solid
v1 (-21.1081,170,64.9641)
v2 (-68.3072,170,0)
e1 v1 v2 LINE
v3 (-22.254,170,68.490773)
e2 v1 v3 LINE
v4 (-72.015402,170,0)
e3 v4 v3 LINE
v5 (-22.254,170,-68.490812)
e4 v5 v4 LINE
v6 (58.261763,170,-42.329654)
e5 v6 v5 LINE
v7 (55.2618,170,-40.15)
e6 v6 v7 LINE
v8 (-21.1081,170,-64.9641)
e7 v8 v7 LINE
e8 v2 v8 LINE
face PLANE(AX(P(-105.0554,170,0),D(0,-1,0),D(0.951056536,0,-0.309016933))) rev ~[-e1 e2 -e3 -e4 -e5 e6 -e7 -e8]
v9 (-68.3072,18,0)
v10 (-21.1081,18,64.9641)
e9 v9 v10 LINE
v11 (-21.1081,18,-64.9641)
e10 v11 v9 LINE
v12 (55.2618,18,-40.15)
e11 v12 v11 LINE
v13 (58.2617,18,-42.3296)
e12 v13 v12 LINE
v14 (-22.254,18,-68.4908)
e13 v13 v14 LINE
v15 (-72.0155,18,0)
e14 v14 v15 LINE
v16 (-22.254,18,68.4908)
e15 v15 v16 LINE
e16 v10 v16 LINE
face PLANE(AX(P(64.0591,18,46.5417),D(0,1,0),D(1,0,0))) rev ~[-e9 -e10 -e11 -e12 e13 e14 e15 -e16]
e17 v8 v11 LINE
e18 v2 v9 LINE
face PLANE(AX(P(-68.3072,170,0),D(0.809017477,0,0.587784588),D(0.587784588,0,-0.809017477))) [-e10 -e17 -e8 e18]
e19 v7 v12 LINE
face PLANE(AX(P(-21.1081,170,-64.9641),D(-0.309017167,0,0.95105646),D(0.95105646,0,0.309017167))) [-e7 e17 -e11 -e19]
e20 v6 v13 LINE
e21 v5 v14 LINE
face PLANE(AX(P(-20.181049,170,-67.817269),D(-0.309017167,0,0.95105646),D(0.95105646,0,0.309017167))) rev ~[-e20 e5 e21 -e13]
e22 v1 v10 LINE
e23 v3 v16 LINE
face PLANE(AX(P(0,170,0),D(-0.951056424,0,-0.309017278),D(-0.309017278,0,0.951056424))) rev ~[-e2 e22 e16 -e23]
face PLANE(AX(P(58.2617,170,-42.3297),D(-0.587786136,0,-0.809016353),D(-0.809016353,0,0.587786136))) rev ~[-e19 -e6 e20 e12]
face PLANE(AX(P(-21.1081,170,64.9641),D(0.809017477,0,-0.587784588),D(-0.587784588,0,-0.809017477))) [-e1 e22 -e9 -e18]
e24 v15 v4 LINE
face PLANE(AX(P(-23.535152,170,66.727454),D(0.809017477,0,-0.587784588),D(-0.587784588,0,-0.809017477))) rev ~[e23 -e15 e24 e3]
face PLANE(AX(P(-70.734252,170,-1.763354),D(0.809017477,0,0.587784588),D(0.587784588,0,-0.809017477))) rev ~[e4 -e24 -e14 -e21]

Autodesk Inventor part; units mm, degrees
sketch "草图1" plane through (0, 0, 0) normal (0, 1, 0) x (-1, 0, 0)
  line L0 (82.5131, 0) -> (25.498, -78.4746)
  line L1 (25.498, -78.4746) -> (-66.7545, -48.5)
  line L2 (-66.7545, -48.5) -> (-66.7545, 48.5)
  line L3 (-66.7545, 48.5) -> (25.498, 78.4746)
  line L4 (25.498, 78.4746) -> (82.5131, 0)
  point P0 (0, 0)
  point P1 (0, 0)
  dimension "d0" = 97
ref_plane "工作平面1" through (0, 170, 0) normal (0, 1, 0) x (-1, 0, 0)
sketch "草图2" plane through (0, 170, 0) normal (0, 1, 0) x (-1, 0, 0)
  line L0 (105.0554, 0) -> (32.4639, -99.9136)
  line L1 (32.4639, -99.9136) -> (-84.9916, -61.75)
  line L2 (-84.9916, -61.75) -> (-84.9916, 61.75)
  line L3 (-84.9916, 61.75) -> (32.4639, 99.9136)
  line L4 (32.4639, 99.9136) -> (105.0554, 0)
  point P0 (0, 0)
  point P1 (0, 0)
  dimension "d2" = 123.5
loft "放样1" add profiles "草图2", "草图1"
sketch "草图3" plane through (84.9916, 170, 61.75) normal (0, 1, 0) x (1, 0, 0)
  line L0 (-153.2988, 61.75) -> (-106.0997, 126.7141)
  line L1 (-106.0997, 126.7141) -> (-29.7298, 101.9)
  line L2 (-29.7298, 101.9) -> (-29.7298, 21.6)
  line L3 (-29.7298, 21.6) -> (-106.0997, -3.2141)
  line L4 (-106.0997, -3.2141) -> (-153.2988, 61.75)
  point P0 (-84.9916, 61.75)
  point P1 (-84.9916, 61.75)
  dimension "d7" = 80.3
extrude "拉伸1" cut sketch "草图3" against normal blind 164
shell "抽壳1" thickness 3 removed faces 1 at (10.4732, 170, -75.5426)
sketch "草图5" plane through (66.7545, 0, -48.5) normal (0, -1, 0) x (1, 0, 0)
  line L0 (-98.0659, 144.8667) -> (-91.2229, 123.806) projected
  line L1 (-106.5917, 71.5) -> (-123.9122, 81.5)
  line L2 (-107.7408, 69.3836) -> (-125.561, 78.4634)
  arc A0 (-106.5917, 71.5) -> (-107.7408, 69.3836) centre (-66.7545, 48.5) ccw
  arc A1 (-123.9122, 81.5) -> (-125.561, 78.4634) centre (-66.7545, 48.5) ccw
  point P0 (-99.2814, 81.0269)
  dimension "d37" = 132
  dimension "d38" = 92
  dimension "d40" = 3
extrude "拉伸2" add sketch "草图5" along normal blind 3
sketch "草图7" plane through (66.7545, -3, -48.5) normal (0, -1, 0) x (1, 0, 0)
  arc A0 (-100.9392, 79.28) -> (-106.5917, 71.5) centre (-66.7545, 48.5) ccw
  arc A1 (-115.8021, 92.6626) -> (-125.561, 78.4634) centre (-66.7545, 48.5) ccw
  arc A2 (-100.9392, 79.28) -> (-107.7408, 69.3836) centre (-66.7545, 48.5) ccw
  line L0 (-100.9392, 79.28) -> (-115.8021, 92.6626)
  line L1 (-125.561, 78.4634) -> (-107.7408, 69.3836) projected
  line L2 (-107.7408, 69.3836) -> (-125.561, 78.4634)
  dimension "d25" = 92
  dimension "d41" = 15
extrude "拉伸3" add sketch "草图7" along normal blind 3
chamfer "倒角1" distance 1 angle 45 1 edges at (-41.6161, -3, 37.4713)
sketch "草图8" plane through (66.7545, 0, -48.5) normal (0, -1, 0) x (1, 0, 0)
  circle A0 centre (-66.7545, 48.5) radius 15
  dimension "d100" = 30
extrude "拉伸4" add sketch "草图8" along normal blind 30
pattern_circular "环形阵列1" count 10 over 360 about axis through (0, -10, 0) along (0, 1, 0) of "拉伸3", "拉伸2", "倒角1"
sketch "草图9" plane through (64.0591, 3, 46.5417) normal (0, 1, 0) x (1, 0, 0)
  line L0 (-132.3664, 46.5417) -> (-85.1672, 111.5058) projected
  line L1 (-85.1672, -18.4224) -> (-132.3664, 46.5417) projected
  line L2 (-8.7974, 6.3917) -> (-85.1672, -18.4224) projected
  line L3 (-8.7974, 86.6917) -> (-8.7974, 6.3917) projected
  line L4 (-85.1672, 111.5058) -> (-8.7974, 86.6917) projected
  line L5 (-136.0746, 46.5417) -> (-86.3131, -21.9491) projected
  line L6 (-86.3131, -21.9491) -> (-5.7974, 4.2121) projected
  line L7 (-5.7974, 4.2121) -> (-5.7974, 88.8713) projected
  line L8 (-5.7974, 88.8713) -> (-86.3131, 115.0325) projected
  line L9 (-86.3131, 115.0325) -> (-136.0746, 46.5417) projected
  line L10 (-85.1672, -18.4224) -> (-132.3664, 46.5417) projected
  line L11 (-132.3664, 46.5417) -> (-85.1672, 111.5058) projected
  line L12 (-85.1672, 111.5058) -> (-8.7974, 86.6917) projected
  line L13 (-8.7974, 86.6917) -> (-8.7974, 6.3917) projected
  line L14 (-8.7974, 6.3917) -> (-85.1672, -18.4224) projected
  line L15 (-143.2406, 46.5417) -> (-88.5276, 121.8477) projected
  line L16 (-88.5276, -28.7643) -> (-143.2406, 46.5417) projected
  line L17 (0, 0) -> (-88.5276, -28.7643) projected
  line L18 (0, 93.0834) -> (0, 0) projected
  line L19 (-88.5276, 121.8477) -> (0, 93.0834) projected
  line L20 (-145.4076, 46.5417) -> (-89.1972, 123.9087)
  line L21 (-89.1972, 123.9087) -> (1.7532, 94.3571)
  line L22 (1.7532, 94.3571) -> (1.7532, -1.2738)
  line L23 (1.7532, -1.2738) -> (-89.1972, -30.8253)
  line L24 (-89.1972, -30.8253) -> (-145.4076, 46.5417)
  point P0 (-64.0591, 46.5417)
extrude "拉伸5" add sketch "草图9" along normal blind 15 contours L15 L19 L18 L17 L16 | L20 L21 L22 L23 L24
sketch "草图10" plane through (84.9916, 6, 61.75) normal (0, 1, 0) x (1, 0, 0)
  line L0 (-153.2988, 61.75) -> (-106.0997, 126.7141) projected
  line L1 (-106.0997, -3.2141) -> (-153.2988, 61.75) projected
  line L2 (-29.7298, 21.6) -> (-106.0997, -3.2141) projected
  line L3 (-29.7298, 101.9) -> (-29.7298, 21.6) projected
  line L4 (-106.0997, 126.7141) -> (-29.7298, 101.9) projected
  line L5 (-107.2456, 130.2408) -> (-157.007, 61.75) projected
  line L6 (-26.7298, 104.0796) -> (-107.2456, 130.2408) projected
  line L7 (-26.7298, 19.4204) -> (-26.7298, 104.0796) projected
  line L8 (-107.2456, -6.7408) -> (-26.7298, 19.4204) projected
  line L9 (-157.007, 61.75) -> (-107.2456, -6.7408) projected
  line L10 (-166.1621, 61.75) -> (-110.0746, 138.9477) projected
  line L11 (-110.0746, -15.4477) -> (-166.1621, 61.75) projected
  line L12 (-19.3233, 14.0392) -> (-110.0746, -15.4477) projected
  line L13 (-19.3233, 109.4608) -> (-19.3233, 14.0392) projected
  line L14 (-110.0746, 138.9477) -> (-19.3233, 109.4608) projected
  point P0 (-84.9916, 61.75)
sketch "草图11" plane through (64.0591, 18, 46.5417) normal (0, 1, 0) x (1, 0, 0)
  line L0 (-64.0591, 46.5417) -> (2.6954, 46.5417) construction
  line L1 (-86.3131, 115.0325) -> (-136.0746, 46.5417) projected
  line L2 (-5.7974, 88.8713) -> (-86.3131, 115.0325) projected
  line L3 (-5.7974, 4.2121) -> (-5.7974, 88.8713) projected
  line L4 (-86.3131, -21.9491) -> (-5.7974, 4.2121) projected
  line L5 (-136.0746, 46.5417) -> (-86.3131, -21.9491) projected
  line L6 (-145.2296, 46.5417) -> (-89.1422, 123.7394) projected
  line L7 (-89.1422, -30.656) -> (-145.2296, 46.5417) projected
  line L8 (1.6092, -1.1691) -> (-89.1422, -30.656) projected
  line L9 (1.6092, 94.2525) -> (1.6092, -1.1691) projected
  line L10 (-89.1422, 123.7394) -> (1.6092, 94.2525) projected
  circle A0 centre (-2.0908, 11.2121) radius 1.25
  line L11 (-5.7974, 4.2121) -> (1.6092, -1.1691) construction
  line L12 (-5.7974, 4.2121) -> (-5.7974, 88.8713) projected
  line L13 (-86.3131, -21.9491) -> (-5.7974, 4.2121) projected
  line L14 (1.6092, -1.1691) -> (-89.1422, -30.656) projected
  line L15 (1.6092, 94.2525) -> (1.6092, -1.1691) projected
  circle A1 centre (-11.3094, -1.4762) radius 1.25
  line L16 (-2.0941, 7.5215) -> (-0.5941, 7.5215)
  line L17 (-0.5941, 7.5215) -> (-0.5941, 0.4317)
  line L18 (-2.0941, 7.5215) -> (-3.5941, 7.5215)
  line L19 (-3.5941, 7.5215) -> (-3.5941, 2.6113)
  line L20 (-7.8005, -0.3326) -> (-7.3369, -1.7592)
  line L21 (-7.3369, -1.7592) -> (-0.5941, 0.4317)
  line L22 (-7.8005, -0.3326) -> (-8.264, 1.094)
  line L23 (-8.264, 1.094) -> (-3.5941, 2.6113)
  dimension "d63" = 2.5
  dimension "d69" = 3.7
  dimension "d131" = 3.6906
extrude "拉伸7" cut sketch "草图11" against normal blind 3 contours A0 | A1 | L16 L17 L21 L20 L22 L23 L19 L18
extrude "拉伸8" add sketch "草图10" along normal blind 10 and the other way blind 3 contours L10 L14 L13 L12 L11
extrude "拉伸9" cut sketch "草图10" along normal blind 10 and the other way blind 3 contours L10 L14 L13 L12 L11
ref_plane "工作平面2" through (84.9916, 7, 61.75) normal (0, 1, 0) x (1, 0, 0)
sketch "草图12" plane through (84.9916, 7, 61.75) normal (0, 1, 0) x (1, 0, 0)
  line L0 (-107.2456, -6.7408) -> (-26.7298, 19.4204) projected
  line L1 (-60.7054, 8.3811) -> (-61.6324, 11.2342)
  line L2 (-29.7298, 21.6) -> (-106.0997, -3.2141) projected
  line L3 (-89.8404, 2.0689) -> (-88.9133, -0.7843)
  line L4 (-107.2456, -6.7408) -> (-26.7298, 19.4204) projected
  line L5 (-29.7298, 21.6) -> (-106.0997, -3.2141) projected
  line L6 (-63.5345, 10.6162) -> (-62.6075, 7.763)
  line L7 (-65.4366, 9.9982) -> (-64.5096, 7.145)
  line L8 (-67.3388, 9.3801) -> (-66.4117, 6.527)
  line L9 (-69.2409, 8.7621) -> (-68.3138, 5.9089)
  line L10 (-71.143, 8.1441) -> (-70.2159, 5.2909)
  line L11 (-73.0451, 7.526) -> (-72.118, 4.6729)
  line L12 (-74.9472, 6.908) -> (-74.0202, 4.0548)
  line L13 (-76.7905, 6.3091) -> (-75.7638, 3.4883)
  line L14 (-84.134, 3.923) -> (-83.207, 1.0698)
  line L15 (-86.0362, 3.305) -> (-85.1091, 0.4518)
  line L16 (-87.9383, 2.6869) -> (-87.0112, -0.1662)
  line L17 (-80.3298, 5.1591) -> (-79.4028, 2.3059)
  line L18 (-82.2319, 4.541) -> (-81.3049, 1.6879)
  line L19 (-78.4277, 5.7771) -> (-77.5006, 2.9239)
  line L20 (-61.6324, 11.2342) -> (-63.5345, 10.6162)
  line L21 (-62.6075, 7.763) -> (-60.7054, 8.3811)
  line L22 (-66.4117, 6.527) -> (-64.5096, 7.145)
  line L23 (-65.4366, 9.9982) -> (-67.3388, 9.3801)
  line L24 (-70.2159, 5.2909) -> (-68.3138, 5.9089)
  line L25 (-69.2409, 8.7621) -> (-71.143, 8.1441)
  line L26 (-74.0202, 4.0548) -> (-72.118, 4.6729)
  line L27 (-73.0451, 7.526) -> (-74.9472, 6.908)
  line L28 (-76.7905, 6.3091) -> (-78.4277, 5.7771)
  line L29 (-77.5006, 2.9239) -> (-75.7638, 3.4883)
  line L30 (-81.3049, 1.6879) -> (-79.4028, 2.3059)
  line L31 (-80.3298, 5.1591) -> (-82.2319, 4.541)
  line L32 (-84.134, 3.923) -> (-86.0362, 3.305)
  line L33 (-87.9383, 2.6869) -> (-89.8404, 2.0689)
  line L34 (-88.9133, -0.7843) -> (-87.0112, -0.1662)
  line L35 (-85.1091, 0.4518) -> (-83.207, 1.0698)
  line L36 (-58.8033, 8.9991) -> (-59.7303, 11.8523)
  line L37 (-56.9011, 9.6171) -> (-57.8282, 12.4703)
  line L38 (-54.999, 10.2352) -> (-55.9261, 13.0883)
  line L39 (-53.0969, 10.8532) -> (-54.024, 13.7064)
  point P0 (-84.9916, 61.75)
  dimension "d73" = 2
  dimension "d74" = 2
  dimension "d75" = 2
  dimension "d76" = 2
  dimension "d77" = 2
  dimension "d78" = 2
  dimension "d79" = 2
  dimension "d80" = 2
  dimension "d81" = 2
  dimension "d82" = 2
  dimension "d83" = 2
  dimension "d84" = 2
  dimension "d85" = 2
  dimension "d86" = 2
  dimension "d88" = 2
  dimension "d89" = 2
  dimension "d90" = 2
  dimension "d91" = 2
extrude "拉伸10" cut sketch "草图12" along normal blind 7 contours L3 L2 L16 L0 | L15 L2 L14 L0 | L18 L2 L17 L0 | L19 L2 L13 L0 | L12 L2 L11 L0 | L10 L2 L9 L0 | L8 L2 L7 L0 | L6 L2 L1 L0 | L36 L2 L37 L0 | L38 L2 L39 L0
pattern_circular "环形阵列2" count 5 over 360 about axis through (0, 0, 0) along (0, -1, 0) of "拉伸10"
sketch "草图13" plane through (66.7545, 0, -48.5) normal (0, -1, 0) x (1, 0, 0)
  line L0 (1.9326, 98.4258) -> (-1.1068, 96.2175) construction
  line L1 (18.2371, 110.25) -> (0, 97) construction
  line L2 (-16.2555, 104.3138) -> (1.9326, 98.4258)
  line L3 (1.9326, 98.4258) -> (1.9326, 79.28)
  line L4 (-14.6399, 100.6147) -> (-1.1068, 96.2175)
  line L5 (-1.0862, 96.2108) -> (-1.0862, 81.9597)
  line L6 (-1.0862, 81.9597) -> (1.9326, 79.28)
  line L7 (-14.6399, 100.6147) -> (-16.2555, 104.3138)
  line L8 (1.9326, 98.4258) -> (1.9326, 79.28)
  line L9 (1.9326, 79.28) -> (-1.0862, 81.9597)
  line L10 (-1.0862, 0.7892) -> (-1.0862, 96.2108) projected
  line L11 (-1.0862, 81.9597) -> (-1.0862, 96.2108)
  line L12 (-1.0862, 96.2108) -> (-14.6399, 100.6147)
  line L13 (-91.8376, 125.6977) -> (-1.0862, 96.2108) projected
  line L14 (0, 97) -> (-92.2525, 126.9746) projected
  line L15 (-14.6399, 100.6147) -> (-16.2555, 104.3138)
  line L16 (-16.2555, 104.3138) -> (1.9326, 98.4258)
  point P0 (-66.7545, 48.5)
  point P1 (18.2371, 110.25)
extrude "拉伸11" cut sketch "草图13" against normal blind 16
sketch "草图14" plane through (0, -30, 0) normal (0, -1, 0) x (1, 0, 0)
  line L0 (11.4602, -0.9019) -> (-11.5398, -0.9019)
  line L1 (-11.5398, -0.9019) -> (-11.5398, 0.7981)
  line L2 (-11.5398, 0.7981) -> (11.4602, 0.7981)
  line L3 (11.4602, 0.7981) -> (11.4602, -0.9019)
  line L4 (15.9292, -0.0519) -> (-16.622, -0.0519) construction
  line L5 (-0.0398, 4.6584) -> (-0.0398, -5.7431) construction
  point P0 (0, 0)
  dimension "d94" = 23
  dimension "d95" = 1.7
extrude "拉伸12" cut sketch "草图14" along normal blind 10 and the other way blind 54.75
sketch "草图15" plane through (0, -30, 0) normal (0, -1, 0) x (1, 0, 0)
  line L0 (11.4602, 0.7981) -> (-11.5398, 0.7981) projected
  line L1 (9.9602, 0.7981) -> (-10.0398, 0.7981)
  line L2 (-10.0398, 0.7981) -> (-10.0398, 2.5981)
  line L3 (-10.0398, 2.5981) -> (9.9602, 2.5981)
  line L4 (9.9602, 2.5981) -> (9.9602, 0.7981)
  line L5 (11.4602, -0.9019) -> (-11.5398, -0.9019) projected
  line L6 (-0.0398, 30.3943) -> (-0.0398, -31.216) construction
  point P0 (0, 0)
  dimension "d101" = 3.5
  dimension "d102" = 20
extrude "拉伸13" cut sketch "草图15" against normal blind 30
sketch "草图16" plane through (0, -30, 0) normal (0, -1, 0) x (1, 0, 0)
  line L0 (11.4602, 0.7981) -> (-11.5398, 0.7981) projected
  line L1 (-5.5398, 0.7981) -> (5.4602, 0.7981)
  line L2 (5.4602, 0.7981) -> (5.4602, 6.5981)
  line L3 (5.4602, 6.5981) -> (-5.5398, 6.5981)
  line L4 (-5.5398, 6.5981) -> (-5.5398, 0.7981)
  line L5 (11.4602, -0.9019) -> (-11.5398, -0.9019) projected
  line L6 (-0.0398, 25.7819) -> (-0.0398, -22.2478) construction
  point P0 (0, 0)
  dimension "d105" = 7.5
  dimension "d106" = 11
extrude "拉伸14" cut sketch "草图16" against normal blind 6
ref_plane "工作平面3" through (0, -28, 0) normal (0, -1, 0) x (1, 0, 0)
sketch "草图18" plane through (0, -28, 0) normal (0, -1, 0) x (1, 0, 0)
  line L0 (5.4602, 6.5981) -> (5.4602, 2.5981) projected
  line L1 (5.4602, 2.5981) -> (9.9602, 2.5981) projected
  line L2 (9.9602, 2.5981) -> (9.9602, 0.7981) projected
  line L3 (9.9602, 0.7981) -> (11.4602, 0.7981) projected
  line L4 (11.4602, 0.7981) -> (11.4602, -0.9019) projected
  line L5 (11.4602, -0.9019) -> (-11.5398, -0.9019) projected
  line L6 (-11.5398, -0.9019) -> (-11.5398, 0.7981) projected
  line L7 (-11.5398, 0.7981) -> (-10.0398, 0.7981) projected
  line L8 (-10.0398, 0.7981) -> (-10.0398, 2.5981) projected
  line L9 (-10.0398, 2.5981) -> (-5.5398, 2.5981) projected
  line L10 (-5.5398, 2.5981) -> (-5.5398, 6.5981) projected
  line L11 (-5.5398, 6.5981) -> (5.4602, 6.5981) projected
  circle A0 centre (0, 0) radius 15 projected
  line L12 (-12.5398, -1.9019) -> (12.4602, -1.9019)
  line L13 (12.4602, -1.9019) -> (12.4602, 1.7981)
  line L14 (12.4602, 1.7981) -> (10.9602, 1.7981)
  line L15 (10.9602, 1.7981) -> (10.9602, 3.5981)
  line L16 (10.9602, 3.5981) -> (6.4602, 3.5981)
  line L17 (6.4602, 3.5981) -> (6.4602, 7.5981)
  line L18 (6.4602, 7.5981) -> (-6.5398, 7.5981)
  line L19 (-6.5398, 7.5981) -> (-6.5398, 3.5981)
  line L20 (-6.5398, 3.5981) -> (-11.0398, 3.5981)
  line L21 (-11.0398, 3.5981) -> (-11.0398, 1.7981)
  line L22 (-11.0398, 1.7981) -> (-12.5398, 1.7981)
  line L23 (-12.5398, 1.7981) -> (-12.5398, -1.9019)
  circle A1 centre (0, 0) radius 14
  point P0 (0, 0)
  dimension "d110" = 1
  dimension "d111" = 1
extrude "拉伸15" cut sketch "草图18" against normal blind 30 contours A1
sketch "草图19" plane through (66.7545, 0, -48.5) normal (0, -1, 0) x (1, 0, 0)
  line L0 (-60.2943, 56.0981) -> (-73.2943, 56.0981) projected
  line L1 (-73.2943, 52.0981) -> (-77.7943, 52.0981) projected
  line L2 (-60.2943, 56.0981) -> (-73.2943, 56.0981)
  line L3 (-73.2943, 56.0981) -> (-73.2943, 52.0981)
  line L4 (-73.2943, 52.0981) -> (-60.2943, 52.0981)
  line L5 (-60.2943, 52.0981) -> (-60.2943, 56.0981)
  point P0 (-66.7545, 48.5)
extrude "拉伸16" cut sketch "草图19" along normal blind 22 and the other way blind 2
sketch "草图21" plane through (0, -30, 0) normal (0, -1, 0) x (1, 0, 0)
  line L0 (5.4602, 6.5981) -> (5.4602, 2.5981) projected
  line L1 (5.4602, 2.5981) -> (9.9602, 2.5981) projected
  line L2 (9.9602, 2.5981) -> (9.9602, 0.7981) projected
  line L3 (9.9602, 0.7981) -> (11.4602, 0.7981) projected
  line L4 (11.4602, 0.7981) -> (11.4602, -0.9019) projected
  line L5 (11.4602, -0.9019) -> (-11.5398, -0.9019) projected
  line L6 (-11.5398, -0.9019) -> (-11.5398, 0.7981) projected
  line L7 (-11.5398, 0.7981) -> (-10.0398, 0.7981) projected
  line L8 (-10.0398, 0.7981) -> (-10.0398, 2.5981) projected
  line L9 (-10.0398, 2.5981) -> (-5.5398, 2.5981) projected
  line L10 (-5.5398, 2.5981) -> (-5.5398, 6.5981) projected
  line L11 (-5.5398, 6.5981) -> (5.4602, 6.5981) projected
  circle A0 centre (0, 0) radius 15 projected
  point P0 (0, 0)
extrude "拉伸17" add sketch "草图21" along normal blind 3
sketch "草图22" plane through (5.4602, -24, 6.5981) normal (0, 0, -1) x (-1, 0, 0)
  line L0 (9.1141, -4) -> (1.9525, -4)
  line L1 (1.9525, -4) -> (9.1141, -4)
  line L2 (9.1141, -4) -> (9.1141, -9.2971)
  line L3 (9.1141, -9.2971) -> (1.9525, -9.2971)
  line L4 (1.9525, -9.2971) -> (1.9525, -4)
  point P0 (5.4602, 24)
extrude "拉伸18" cut sketch "草图22" against normal blind 10
sketch "草图23" plane through (0, -33, 0) normal (0, -1, 0) x (1, 0, 0)
  line L0 (5.555, -0.8779) -> (-5.9531, -0.8779)
  line L1 (-5.9531, -0.8779) -> (-5.9531, -3.3779)
  line L2 (-5.9531, -3.3779) -> (5.555, -3.3779)
  line L3 (5.555, -3.3779) -> (5.555, -0.8779)
  point P0 (0, 0)
  dimension "d125" = 2.5
extrude "拉伸19" cut sketch "草图23" against normal blind 10
sketch "草图24" plane through (64.0591, 18, 46.5417) normal (0, 1, 0) x (1, 0, 0)
  line L0 (-5.7974, 4.2121) -> (-5.7974, 88.8713) projected
  circle A0 centre (-64.0591, 46.5417) radius 14 projected
  line L1 (-75.5989, 45.7436) -> (-75.5989, 47.4436) projected
  line L2 (-75.5989, 47.4436) -> (-52.5989, 47.4436) projected
  line L3 (-52.5989, 47.4436) -> (-52.5989, 45.7436) projected
  line L4 (-52.5989, 45.7436) -> (-75.5989, 45.7436) projected
  line L5 (-132.3664, 46.5417) -> (-85.1672, 111.5058) projected
  line L6 (-85.1672, -18.4224) -> (-132.3664, 46.5417) projected
  line L7 (-8.7974, 6.3917) -> (-85.1672, -18.4224) projected
  line L8 (-8.7974, 86.6917) -> (-8.7974, 6.3917) projected
  line L9 (-85.1672, 111.5058) -> (-8.7974, 86.6917) projected
  line L10 (-87.2718, 117.9831) -> (-139.177, 46.5417)
  line L11 (-139.177, 46.5417) -> (-87.2718, -24.8997)
  line L12 (-87.2718, -24.8997) -> (-3.2875, 2.3885)
  line L13 (-3.2875, 2.3885) -> (-3.2875, 90.6949)
  line L14 (-3.2875, 90.6949) -> (-87.2718, 117.9831)
  point P0 (-64.0591, 46.5417)
extrude "拉伸20" cut sketch "草图24" along normal blind 300 contours L5 L9 L8 L7 L6 | L14 L13 L12 L11 L10 keep common part
sketch "草图25" plane through (58.2617, 170, 42.3296) normal (0, 1, 0) x (1, 0, 0)
  line L0 (-80.5157, -26.1611) -> (0, 0) projected
  line L1 (-58.2617, 42.3296) -> (-80.5157, -26.1611)
  line L2 (-80.5157, -26.1611) -> (-182.834, -34.6121)
  line L3 (-182.834, -34.6121) -> (-113.7838, 144.0731)
  line L4 (-113.7838, 144.0731) -> (26.5714, 112.7891)
  line L5 (0, 84.6593) -> (-80.5157, 110.8204) projected
  line L6 (26.5714, 112.7891) -> (0, 84.6593)
  line L7 (0, 84.6593) -> (-58.2617, 42.3296)
extrude "拉伸21" cut sketch "草图25" against normal blind 200 keep common part
properties part number "花盆主体" material "尼龙 6/6"
